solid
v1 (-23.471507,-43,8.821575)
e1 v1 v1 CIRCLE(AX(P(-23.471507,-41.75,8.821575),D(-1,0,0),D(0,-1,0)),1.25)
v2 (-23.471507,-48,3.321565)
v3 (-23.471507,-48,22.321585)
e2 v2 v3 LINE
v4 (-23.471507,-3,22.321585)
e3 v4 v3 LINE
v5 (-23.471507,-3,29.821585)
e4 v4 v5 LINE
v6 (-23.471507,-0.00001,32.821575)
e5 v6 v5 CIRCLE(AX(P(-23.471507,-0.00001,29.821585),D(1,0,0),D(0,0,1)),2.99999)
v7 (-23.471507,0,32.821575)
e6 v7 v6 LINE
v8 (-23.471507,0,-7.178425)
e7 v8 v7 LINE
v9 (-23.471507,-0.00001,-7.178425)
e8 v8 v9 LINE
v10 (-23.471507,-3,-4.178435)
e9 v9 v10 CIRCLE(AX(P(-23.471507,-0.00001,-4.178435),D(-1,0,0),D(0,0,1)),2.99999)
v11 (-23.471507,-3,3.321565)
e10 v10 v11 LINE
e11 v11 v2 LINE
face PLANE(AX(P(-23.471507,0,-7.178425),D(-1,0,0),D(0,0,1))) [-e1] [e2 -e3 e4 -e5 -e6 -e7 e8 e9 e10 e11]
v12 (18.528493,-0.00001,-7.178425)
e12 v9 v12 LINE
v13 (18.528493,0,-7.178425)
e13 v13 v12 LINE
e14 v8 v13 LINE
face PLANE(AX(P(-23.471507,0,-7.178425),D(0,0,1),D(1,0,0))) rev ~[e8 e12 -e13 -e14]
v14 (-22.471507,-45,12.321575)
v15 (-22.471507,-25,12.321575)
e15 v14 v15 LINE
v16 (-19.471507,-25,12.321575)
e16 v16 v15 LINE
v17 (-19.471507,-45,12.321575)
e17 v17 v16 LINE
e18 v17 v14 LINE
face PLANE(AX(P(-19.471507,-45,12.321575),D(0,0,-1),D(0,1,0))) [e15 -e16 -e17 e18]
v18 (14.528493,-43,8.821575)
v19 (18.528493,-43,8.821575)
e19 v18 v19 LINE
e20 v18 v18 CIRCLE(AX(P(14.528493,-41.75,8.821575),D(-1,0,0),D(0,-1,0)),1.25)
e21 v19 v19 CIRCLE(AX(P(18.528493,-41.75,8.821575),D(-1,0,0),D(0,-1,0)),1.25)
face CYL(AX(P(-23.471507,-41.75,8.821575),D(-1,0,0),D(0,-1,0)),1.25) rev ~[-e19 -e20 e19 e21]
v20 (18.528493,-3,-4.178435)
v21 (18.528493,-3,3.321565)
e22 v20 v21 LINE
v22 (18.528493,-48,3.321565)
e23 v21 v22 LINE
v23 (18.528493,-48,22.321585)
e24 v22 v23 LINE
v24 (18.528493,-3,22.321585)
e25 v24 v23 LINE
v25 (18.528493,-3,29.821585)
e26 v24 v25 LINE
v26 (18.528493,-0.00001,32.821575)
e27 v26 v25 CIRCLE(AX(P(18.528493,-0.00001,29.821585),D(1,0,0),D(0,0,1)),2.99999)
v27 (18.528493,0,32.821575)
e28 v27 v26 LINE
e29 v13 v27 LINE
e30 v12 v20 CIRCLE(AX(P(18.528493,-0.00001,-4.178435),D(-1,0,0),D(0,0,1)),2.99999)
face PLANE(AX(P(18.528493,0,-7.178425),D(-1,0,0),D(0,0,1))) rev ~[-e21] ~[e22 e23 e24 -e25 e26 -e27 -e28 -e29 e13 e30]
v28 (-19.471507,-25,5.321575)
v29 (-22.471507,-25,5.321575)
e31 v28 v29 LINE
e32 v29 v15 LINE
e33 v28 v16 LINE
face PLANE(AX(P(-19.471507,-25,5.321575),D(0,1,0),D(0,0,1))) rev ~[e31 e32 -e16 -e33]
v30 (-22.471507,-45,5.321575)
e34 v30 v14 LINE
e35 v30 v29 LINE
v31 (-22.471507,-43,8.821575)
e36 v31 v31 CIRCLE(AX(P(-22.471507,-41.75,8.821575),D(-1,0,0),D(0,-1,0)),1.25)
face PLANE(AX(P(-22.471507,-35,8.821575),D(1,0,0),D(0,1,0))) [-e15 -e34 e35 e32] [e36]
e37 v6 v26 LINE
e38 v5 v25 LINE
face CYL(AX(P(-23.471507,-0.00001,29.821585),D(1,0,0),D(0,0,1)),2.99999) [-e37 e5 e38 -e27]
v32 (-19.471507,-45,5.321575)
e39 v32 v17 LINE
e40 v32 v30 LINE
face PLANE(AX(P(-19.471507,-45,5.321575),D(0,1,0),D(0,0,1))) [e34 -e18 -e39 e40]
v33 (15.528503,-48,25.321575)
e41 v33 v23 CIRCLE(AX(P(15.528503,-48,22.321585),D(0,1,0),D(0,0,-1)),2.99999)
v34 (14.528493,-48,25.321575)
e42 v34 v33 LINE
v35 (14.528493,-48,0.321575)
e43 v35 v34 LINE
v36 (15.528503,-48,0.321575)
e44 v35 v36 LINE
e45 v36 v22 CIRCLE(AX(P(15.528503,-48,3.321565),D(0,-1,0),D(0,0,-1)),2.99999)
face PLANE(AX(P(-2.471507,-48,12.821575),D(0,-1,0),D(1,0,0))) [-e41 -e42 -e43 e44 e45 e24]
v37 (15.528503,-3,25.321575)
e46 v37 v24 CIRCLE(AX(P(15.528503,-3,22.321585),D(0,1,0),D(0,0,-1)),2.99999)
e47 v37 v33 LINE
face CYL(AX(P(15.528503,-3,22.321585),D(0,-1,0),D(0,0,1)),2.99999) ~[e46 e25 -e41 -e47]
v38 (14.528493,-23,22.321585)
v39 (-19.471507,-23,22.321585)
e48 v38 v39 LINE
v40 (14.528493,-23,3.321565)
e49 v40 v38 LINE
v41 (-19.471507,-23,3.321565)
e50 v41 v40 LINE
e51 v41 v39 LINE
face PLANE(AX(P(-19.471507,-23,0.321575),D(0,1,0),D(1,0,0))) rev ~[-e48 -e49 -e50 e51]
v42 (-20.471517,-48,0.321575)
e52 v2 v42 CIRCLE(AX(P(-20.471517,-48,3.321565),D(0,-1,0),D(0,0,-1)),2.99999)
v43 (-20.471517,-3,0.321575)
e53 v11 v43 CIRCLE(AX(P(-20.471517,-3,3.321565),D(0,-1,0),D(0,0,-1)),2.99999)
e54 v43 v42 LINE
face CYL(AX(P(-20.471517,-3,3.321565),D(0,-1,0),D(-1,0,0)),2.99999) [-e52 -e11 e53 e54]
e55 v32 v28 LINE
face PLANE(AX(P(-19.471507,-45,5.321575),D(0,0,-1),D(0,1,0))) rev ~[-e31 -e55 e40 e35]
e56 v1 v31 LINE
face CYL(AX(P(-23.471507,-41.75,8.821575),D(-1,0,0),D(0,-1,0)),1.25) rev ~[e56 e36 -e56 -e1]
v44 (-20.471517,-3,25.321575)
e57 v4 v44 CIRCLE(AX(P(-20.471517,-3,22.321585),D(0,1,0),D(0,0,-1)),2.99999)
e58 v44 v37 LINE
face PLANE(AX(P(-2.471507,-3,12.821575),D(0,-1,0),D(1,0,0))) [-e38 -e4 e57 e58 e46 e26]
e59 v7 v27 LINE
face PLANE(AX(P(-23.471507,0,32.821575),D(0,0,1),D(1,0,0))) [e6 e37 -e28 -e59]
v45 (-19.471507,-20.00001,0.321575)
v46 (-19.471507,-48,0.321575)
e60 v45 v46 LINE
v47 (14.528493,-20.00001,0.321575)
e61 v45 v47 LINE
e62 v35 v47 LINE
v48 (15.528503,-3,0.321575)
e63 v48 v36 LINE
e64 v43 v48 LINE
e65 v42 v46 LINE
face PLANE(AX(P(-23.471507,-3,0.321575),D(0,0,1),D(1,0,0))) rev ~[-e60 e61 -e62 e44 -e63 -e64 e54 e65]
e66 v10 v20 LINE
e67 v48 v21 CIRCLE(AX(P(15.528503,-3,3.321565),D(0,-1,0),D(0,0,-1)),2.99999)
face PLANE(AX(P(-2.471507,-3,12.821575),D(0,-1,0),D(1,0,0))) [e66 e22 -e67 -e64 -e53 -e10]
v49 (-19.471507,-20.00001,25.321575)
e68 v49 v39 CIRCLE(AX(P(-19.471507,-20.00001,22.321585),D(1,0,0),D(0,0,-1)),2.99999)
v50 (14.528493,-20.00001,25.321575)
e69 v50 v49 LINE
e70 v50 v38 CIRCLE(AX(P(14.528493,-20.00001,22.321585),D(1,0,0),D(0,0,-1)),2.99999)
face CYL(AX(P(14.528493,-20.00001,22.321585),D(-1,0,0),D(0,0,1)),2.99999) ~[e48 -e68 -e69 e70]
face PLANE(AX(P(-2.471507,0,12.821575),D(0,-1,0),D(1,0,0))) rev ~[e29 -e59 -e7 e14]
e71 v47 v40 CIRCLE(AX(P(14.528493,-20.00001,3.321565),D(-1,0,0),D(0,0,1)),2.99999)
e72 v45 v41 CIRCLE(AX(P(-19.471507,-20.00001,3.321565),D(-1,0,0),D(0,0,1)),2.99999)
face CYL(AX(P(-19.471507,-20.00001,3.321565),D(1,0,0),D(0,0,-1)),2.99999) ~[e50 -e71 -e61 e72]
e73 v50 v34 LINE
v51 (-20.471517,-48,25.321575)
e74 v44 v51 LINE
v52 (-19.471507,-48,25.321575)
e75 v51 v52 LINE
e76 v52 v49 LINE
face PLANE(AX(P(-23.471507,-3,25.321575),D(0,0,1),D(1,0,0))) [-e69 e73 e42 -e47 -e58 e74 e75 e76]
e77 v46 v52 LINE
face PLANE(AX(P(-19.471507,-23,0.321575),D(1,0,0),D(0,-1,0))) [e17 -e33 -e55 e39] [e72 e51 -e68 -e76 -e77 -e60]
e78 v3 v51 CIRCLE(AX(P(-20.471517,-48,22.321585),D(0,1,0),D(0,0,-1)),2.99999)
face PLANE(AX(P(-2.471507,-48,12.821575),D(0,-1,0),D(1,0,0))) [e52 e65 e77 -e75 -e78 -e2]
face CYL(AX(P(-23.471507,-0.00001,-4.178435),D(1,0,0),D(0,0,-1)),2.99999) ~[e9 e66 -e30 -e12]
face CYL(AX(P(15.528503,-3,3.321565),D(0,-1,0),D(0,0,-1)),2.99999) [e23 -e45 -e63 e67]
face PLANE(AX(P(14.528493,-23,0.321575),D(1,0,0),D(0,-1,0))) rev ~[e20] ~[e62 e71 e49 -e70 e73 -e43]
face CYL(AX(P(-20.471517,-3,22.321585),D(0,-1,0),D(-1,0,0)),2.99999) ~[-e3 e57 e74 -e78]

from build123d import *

# Parameters (mm, degrees)
F0_W     = 42
F0_H     = 40
F1_DEPTH = 3
F2_W     = 42
F2_H     = 25
F3_DEPTH = 45
F4_W     = 34
F4_H     = 25
F5_DEPTH = 32.501
F6_W     = 20
F6_H     = 7
F7_DEPTH = 3
F8_R     = 1.25
F9_DEPTH = 42.001
F10_R    = 2.99999


# Not quite as in the source:
# - a fillet or chamfer is up to 0.001 mm smaller than in the source, because OpenCascade refuses the exact size


with BuildPart() as f1:
    # F0 (on Front) → F1 (new body)
    with BuildSketch(Plane.XZ):
        with Locations((-2.4715067595, 12.8215752275)):
            Rectangle(F0_W, F0_H)
    extrude(amount=F1_DEPTH)

    # F2 (on face) → F3 (join)
    with BuildSketch(Plane.XZ.offset(3)):
        with Locations((-2.4715067595, 12.8215752275)):
            Rectangle(F2_W, F2_H)
    extrude(amount=F3_DEPTH)

    # F4 (on face) → F5 (cut, through all)
    with BuildSketch(Plane(origin=(0, 0, 0.3215752275), x_dir=(1, 0, 0), z_dir=(0, 0, -1))):
        with Locations((-2.4715067595, 35.5)):
            Rectangle(F4_W, F4_H)
    extrude(amount=-F5_DEPTH, mode=Mode.SUBTRACT)

    # F6 (on face) → F7 (cut)
    with BuildSketch(Plane.YZ.offset(-19.4715067595)):
        with Locations((-35, 8.8215752275)):
            Rectangle(F6_W, F6_H)
    extrude(amount=-F7_DEPTH, mode=Mode.SUBTRACT)

    # F8 (on face) → F9 (cut, through all)
    with BuildSketch(Plane(origin=(-23.4715067595, 0, 0), x_dir=(0, -1, 0), z_dir=(-1, 0, 0))):
        with Locations((41.75, 8.8215752275)):
            Circle(F8_R)
    extrude(amount=-F9_DEPTH, mode=Mode.SUBTRACT)

    # F10 (radius 3 in the source; OpenCascade refuses exactly that, so slightly less here)
    f10_edges = [f1.edges().sort_by_distance(p)[0] for p in [
        (-23.471507, -25.5, 0.321575),
        (18.528493, -25.5, 0.321575),
        (-23.471507, -25.5, 25.321575),
        (18.528493, -25.5, 25.321575),
        (-2.471507, -23, 25.321575),
        (-2.471507, -23, 0.321575),
        (-2.471507, -3, -7.178425),
        (-2.471507, -3, 32.821575),
    ]]
    fillet(f10_edges, radius=F10_R)


solid = f1.part
